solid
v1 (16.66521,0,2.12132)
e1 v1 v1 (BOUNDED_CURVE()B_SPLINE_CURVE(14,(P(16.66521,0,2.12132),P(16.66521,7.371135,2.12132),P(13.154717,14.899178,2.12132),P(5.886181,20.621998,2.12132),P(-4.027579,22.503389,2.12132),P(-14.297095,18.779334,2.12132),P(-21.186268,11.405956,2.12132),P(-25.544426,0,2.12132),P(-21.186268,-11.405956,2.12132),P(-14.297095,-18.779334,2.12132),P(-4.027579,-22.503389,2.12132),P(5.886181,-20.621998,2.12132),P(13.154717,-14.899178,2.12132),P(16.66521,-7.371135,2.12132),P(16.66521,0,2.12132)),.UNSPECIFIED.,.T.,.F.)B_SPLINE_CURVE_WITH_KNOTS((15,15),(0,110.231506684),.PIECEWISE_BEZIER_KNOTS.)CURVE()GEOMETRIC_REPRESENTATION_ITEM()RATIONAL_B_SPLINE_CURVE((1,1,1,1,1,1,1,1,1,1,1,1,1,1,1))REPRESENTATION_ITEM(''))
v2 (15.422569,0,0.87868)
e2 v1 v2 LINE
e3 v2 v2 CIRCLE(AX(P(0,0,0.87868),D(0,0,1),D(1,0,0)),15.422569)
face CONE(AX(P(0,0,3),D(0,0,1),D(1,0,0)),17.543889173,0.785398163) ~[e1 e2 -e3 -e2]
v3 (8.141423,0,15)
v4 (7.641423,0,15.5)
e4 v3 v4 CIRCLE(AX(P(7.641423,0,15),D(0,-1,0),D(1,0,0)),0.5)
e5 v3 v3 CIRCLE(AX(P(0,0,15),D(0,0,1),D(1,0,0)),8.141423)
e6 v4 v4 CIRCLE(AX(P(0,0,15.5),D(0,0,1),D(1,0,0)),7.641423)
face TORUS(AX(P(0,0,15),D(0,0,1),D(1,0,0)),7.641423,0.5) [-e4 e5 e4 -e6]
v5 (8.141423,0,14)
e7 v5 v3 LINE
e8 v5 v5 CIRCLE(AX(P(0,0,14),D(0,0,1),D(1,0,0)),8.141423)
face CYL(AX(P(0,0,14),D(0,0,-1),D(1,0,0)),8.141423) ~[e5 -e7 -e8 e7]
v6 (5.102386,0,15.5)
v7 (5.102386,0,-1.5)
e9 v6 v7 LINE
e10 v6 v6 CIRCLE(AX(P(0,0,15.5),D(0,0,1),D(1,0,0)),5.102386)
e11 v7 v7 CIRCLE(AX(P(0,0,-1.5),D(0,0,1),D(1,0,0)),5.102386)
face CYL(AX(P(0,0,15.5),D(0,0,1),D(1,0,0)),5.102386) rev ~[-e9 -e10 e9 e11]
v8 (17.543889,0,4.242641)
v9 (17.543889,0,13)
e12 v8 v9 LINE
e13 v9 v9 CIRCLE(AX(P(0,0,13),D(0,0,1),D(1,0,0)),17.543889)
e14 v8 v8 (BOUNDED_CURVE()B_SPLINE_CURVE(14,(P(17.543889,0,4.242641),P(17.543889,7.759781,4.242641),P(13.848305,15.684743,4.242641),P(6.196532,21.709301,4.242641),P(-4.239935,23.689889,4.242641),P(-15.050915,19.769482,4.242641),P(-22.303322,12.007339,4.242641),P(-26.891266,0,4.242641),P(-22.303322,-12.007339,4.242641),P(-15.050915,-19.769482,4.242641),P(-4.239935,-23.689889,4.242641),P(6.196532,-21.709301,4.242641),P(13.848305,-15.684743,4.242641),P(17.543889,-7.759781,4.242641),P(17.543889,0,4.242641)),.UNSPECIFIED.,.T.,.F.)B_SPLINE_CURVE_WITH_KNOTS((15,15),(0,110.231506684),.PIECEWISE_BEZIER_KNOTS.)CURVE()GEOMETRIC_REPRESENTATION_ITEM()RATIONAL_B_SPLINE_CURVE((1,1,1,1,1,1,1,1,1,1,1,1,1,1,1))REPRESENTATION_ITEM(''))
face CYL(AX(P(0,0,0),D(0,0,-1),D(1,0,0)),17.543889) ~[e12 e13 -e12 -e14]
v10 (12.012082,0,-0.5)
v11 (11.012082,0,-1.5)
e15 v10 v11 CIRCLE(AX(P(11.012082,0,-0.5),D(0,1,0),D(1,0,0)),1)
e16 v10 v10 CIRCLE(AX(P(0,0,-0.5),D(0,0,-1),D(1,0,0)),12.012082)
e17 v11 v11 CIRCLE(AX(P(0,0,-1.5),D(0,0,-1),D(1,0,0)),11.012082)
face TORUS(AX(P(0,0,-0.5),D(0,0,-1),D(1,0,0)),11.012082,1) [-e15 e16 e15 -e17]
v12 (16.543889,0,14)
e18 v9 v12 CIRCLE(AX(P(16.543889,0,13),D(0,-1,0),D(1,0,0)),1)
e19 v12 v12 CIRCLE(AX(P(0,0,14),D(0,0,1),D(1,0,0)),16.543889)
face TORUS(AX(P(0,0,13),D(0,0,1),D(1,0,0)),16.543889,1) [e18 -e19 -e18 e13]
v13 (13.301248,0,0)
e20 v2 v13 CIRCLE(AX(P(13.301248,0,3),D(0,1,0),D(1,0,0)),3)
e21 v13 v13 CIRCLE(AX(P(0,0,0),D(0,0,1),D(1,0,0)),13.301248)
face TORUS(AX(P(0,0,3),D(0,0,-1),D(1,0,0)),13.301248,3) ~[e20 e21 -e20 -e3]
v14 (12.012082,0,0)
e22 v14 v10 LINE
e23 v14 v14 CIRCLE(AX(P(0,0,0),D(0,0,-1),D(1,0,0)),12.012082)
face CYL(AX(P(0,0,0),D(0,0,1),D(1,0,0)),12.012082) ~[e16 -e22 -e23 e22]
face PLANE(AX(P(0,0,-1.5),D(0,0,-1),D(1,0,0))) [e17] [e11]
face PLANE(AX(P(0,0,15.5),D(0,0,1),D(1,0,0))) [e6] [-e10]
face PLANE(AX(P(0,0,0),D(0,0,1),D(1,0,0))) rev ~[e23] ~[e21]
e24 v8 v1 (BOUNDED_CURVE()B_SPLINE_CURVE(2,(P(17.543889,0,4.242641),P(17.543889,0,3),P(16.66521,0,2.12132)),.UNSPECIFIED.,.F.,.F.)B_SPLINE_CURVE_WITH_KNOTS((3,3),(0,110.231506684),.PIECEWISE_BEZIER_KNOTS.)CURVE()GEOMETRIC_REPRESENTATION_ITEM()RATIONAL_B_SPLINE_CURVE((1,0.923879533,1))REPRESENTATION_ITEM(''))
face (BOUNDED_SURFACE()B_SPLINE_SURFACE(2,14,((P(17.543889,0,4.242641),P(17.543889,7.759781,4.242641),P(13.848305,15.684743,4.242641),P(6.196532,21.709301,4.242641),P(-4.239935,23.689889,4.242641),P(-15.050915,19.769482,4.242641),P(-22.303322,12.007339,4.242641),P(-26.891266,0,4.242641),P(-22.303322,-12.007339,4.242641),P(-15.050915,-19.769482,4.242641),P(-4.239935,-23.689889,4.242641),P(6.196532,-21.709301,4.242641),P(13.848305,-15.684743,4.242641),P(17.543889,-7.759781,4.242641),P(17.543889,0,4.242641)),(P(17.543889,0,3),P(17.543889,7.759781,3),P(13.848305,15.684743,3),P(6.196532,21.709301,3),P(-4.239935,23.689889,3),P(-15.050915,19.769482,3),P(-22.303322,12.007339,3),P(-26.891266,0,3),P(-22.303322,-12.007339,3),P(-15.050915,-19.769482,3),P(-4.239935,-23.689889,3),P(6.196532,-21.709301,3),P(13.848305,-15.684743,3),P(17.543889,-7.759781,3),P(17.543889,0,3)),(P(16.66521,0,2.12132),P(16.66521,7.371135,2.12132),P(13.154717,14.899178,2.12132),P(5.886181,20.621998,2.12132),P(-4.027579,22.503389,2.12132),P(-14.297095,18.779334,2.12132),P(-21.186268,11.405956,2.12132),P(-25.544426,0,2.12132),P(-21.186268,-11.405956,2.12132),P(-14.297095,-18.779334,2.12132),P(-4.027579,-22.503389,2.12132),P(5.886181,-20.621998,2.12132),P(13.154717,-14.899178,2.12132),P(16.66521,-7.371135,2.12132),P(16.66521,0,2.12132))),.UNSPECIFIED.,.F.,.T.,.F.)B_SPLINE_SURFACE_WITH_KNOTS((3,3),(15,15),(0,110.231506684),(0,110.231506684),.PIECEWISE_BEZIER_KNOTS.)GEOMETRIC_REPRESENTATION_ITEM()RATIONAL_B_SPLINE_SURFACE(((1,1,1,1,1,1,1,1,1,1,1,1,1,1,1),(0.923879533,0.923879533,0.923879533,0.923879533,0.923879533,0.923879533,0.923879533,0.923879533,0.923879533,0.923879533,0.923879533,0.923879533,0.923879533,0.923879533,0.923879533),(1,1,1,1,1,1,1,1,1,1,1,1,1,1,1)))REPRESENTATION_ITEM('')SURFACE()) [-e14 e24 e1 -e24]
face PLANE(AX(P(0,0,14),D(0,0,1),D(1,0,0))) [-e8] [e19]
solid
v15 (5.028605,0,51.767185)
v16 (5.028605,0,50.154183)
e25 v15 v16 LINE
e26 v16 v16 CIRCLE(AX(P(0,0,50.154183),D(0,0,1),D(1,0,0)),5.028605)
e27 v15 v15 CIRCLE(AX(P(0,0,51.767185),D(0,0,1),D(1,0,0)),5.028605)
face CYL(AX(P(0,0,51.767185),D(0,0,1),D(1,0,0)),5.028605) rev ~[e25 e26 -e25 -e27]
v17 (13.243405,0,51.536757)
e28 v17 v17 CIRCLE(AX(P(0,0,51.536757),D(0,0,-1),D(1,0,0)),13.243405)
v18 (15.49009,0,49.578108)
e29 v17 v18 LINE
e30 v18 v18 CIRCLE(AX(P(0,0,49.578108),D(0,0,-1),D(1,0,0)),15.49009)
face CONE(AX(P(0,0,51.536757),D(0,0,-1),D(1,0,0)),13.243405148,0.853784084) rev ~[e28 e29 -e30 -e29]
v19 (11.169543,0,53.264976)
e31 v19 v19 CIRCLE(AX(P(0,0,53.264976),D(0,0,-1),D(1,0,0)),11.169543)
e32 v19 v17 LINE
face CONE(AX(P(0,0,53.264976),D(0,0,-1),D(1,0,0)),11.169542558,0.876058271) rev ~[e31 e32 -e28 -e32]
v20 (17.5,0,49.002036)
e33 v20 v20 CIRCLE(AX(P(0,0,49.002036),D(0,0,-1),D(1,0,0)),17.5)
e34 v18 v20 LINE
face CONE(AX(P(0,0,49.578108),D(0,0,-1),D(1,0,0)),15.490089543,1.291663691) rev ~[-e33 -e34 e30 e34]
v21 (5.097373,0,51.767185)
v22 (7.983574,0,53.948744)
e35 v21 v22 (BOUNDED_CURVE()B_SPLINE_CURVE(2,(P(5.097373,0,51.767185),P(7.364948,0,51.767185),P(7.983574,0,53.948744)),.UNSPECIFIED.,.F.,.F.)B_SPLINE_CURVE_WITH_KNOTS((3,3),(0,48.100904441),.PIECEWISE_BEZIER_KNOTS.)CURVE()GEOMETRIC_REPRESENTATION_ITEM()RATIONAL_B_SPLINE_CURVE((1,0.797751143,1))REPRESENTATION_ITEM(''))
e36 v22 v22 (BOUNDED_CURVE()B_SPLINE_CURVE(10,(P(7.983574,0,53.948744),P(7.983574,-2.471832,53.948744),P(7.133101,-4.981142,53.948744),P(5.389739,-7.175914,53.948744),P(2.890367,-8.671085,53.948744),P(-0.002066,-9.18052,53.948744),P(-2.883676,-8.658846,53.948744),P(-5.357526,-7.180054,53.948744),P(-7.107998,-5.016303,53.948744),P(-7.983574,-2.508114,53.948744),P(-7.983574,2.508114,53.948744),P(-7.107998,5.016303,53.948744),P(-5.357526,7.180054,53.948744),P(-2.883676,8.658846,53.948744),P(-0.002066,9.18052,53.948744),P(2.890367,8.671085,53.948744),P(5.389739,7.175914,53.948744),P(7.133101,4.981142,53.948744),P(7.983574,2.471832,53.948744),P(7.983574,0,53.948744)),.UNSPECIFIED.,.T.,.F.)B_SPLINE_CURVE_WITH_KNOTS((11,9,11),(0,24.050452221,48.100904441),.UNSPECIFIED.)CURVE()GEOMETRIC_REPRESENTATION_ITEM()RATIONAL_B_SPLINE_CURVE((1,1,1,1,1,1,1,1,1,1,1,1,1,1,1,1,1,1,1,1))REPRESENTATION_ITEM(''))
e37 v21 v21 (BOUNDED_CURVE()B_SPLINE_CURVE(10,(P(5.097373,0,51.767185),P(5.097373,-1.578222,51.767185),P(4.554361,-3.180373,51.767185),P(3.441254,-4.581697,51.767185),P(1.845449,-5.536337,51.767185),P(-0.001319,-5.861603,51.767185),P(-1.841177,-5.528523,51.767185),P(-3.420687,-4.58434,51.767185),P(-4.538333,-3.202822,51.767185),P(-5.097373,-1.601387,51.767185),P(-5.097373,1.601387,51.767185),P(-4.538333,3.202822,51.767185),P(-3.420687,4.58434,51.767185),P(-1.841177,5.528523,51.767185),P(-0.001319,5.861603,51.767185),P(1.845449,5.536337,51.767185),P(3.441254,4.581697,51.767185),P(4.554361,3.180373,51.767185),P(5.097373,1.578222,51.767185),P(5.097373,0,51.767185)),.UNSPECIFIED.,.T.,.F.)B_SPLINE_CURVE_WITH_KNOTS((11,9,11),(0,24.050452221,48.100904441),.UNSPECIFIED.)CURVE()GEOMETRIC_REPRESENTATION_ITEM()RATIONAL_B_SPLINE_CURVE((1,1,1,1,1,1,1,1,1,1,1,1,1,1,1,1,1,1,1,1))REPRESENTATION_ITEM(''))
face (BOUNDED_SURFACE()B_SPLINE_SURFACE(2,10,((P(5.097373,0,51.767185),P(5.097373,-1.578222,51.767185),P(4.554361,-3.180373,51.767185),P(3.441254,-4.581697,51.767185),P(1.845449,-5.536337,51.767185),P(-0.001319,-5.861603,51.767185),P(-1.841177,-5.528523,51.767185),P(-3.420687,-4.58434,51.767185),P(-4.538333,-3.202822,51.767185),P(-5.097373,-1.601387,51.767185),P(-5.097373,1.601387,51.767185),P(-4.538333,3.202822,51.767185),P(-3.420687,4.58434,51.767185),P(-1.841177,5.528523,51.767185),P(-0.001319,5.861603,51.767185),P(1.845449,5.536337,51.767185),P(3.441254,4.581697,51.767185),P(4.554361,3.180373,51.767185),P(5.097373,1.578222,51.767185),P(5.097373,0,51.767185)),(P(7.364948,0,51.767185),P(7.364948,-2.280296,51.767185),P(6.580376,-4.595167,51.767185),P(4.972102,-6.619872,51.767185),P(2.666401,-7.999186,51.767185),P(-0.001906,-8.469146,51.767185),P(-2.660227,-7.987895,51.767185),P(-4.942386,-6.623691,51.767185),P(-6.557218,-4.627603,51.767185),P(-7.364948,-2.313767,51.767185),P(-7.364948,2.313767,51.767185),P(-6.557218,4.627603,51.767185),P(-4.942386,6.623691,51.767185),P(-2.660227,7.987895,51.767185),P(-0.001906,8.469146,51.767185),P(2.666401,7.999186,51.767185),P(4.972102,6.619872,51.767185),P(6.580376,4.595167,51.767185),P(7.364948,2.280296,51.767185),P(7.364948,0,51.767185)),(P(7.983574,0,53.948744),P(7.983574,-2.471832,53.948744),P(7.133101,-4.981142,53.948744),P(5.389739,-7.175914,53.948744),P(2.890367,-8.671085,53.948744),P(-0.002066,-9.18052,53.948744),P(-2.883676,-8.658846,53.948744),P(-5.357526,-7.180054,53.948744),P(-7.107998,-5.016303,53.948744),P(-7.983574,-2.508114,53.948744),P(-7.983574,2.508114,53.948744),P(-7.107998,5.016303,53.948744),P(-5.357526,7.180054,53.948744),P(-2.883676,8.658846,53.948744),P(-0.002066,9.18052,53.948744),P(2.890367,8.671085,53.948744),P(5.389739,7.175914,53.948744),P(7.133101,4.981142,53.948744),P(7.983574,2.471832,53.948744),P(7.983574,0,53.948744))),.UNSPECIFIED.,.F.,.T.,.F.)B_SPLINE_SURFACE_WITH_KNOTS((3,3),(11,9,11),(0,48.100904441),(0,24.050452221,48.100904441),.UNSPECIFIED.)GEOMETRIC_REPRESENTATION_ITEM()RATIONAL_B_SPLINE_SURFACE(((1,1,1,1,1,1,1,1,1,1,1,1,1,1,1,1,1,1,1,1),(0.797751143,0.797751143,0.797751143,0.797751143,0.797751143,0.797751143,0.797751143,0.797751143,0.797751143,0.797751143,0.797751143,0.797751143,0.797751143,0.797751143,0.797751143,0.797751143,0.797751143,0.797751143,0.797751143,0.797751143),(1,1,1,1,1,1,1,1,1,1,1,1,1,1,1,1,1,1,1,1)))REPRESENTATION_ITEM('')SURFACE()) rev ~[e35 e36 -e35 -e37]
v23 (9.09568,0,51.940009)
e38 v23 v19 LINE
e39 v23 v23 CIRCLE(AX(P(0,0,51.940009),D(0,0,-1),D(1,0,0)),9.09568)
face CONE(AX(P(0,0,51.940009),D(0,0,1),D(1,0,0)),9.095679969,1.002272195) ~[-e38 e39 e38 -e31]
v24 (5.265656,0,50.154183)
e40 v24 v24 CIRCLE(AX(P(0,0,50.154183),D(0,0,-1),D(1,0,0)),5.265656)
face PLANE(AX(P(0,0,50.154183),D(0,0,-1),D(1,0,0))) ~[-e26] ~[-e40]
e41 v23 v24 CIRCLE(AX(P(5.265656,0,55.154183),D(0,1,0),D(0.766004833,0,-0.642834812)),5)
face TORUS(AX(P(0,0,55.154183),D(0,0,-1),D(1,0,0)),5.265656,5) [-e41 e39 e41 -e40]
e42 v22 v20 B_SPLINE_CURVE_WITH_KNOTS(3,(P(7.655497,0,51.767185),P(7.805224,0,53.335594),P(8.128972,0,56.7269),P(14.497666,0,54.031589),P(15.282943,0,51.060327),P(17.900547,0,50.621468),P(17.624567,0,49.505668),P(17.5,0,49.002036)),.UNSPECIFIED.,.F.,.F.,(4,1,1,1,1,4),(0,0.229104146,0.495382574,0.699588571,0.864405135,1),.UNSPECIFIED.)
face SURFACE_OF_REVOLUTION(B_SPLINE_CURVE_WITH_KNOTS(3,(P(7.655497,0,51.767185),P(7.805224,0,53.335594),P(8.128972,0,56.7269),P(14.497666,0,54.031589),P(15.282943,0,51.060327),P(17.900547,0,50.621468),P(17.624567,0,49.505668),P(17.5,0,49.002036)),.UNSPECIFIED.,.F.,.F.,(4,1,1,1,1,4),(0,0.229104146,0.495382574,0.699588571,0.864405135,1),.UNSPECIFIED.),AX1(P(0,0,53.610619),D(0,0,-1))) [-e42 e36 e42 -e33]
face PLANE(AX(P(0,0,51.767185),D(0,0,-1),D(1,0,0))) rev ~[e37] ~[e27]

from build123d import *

# Parameters (mm, degrees)
F0_R      = 17.5438891732
F1_DEPTH  = 14
F2_R      = 12.0120819091
F3_DEPTH  = 1.5
F4_R      = 8.1414232705
F5_DEPTH  = 1.5
F6_R      = 5.1023864689
F7_DEPTH  = 25
F8_SIZE   = 3
F9_R      = 3
F10_R     = 1
F11_R     = 0.5
F14_R     = 3
F16_R     = 5.0286050309
F17_DEPTH = 20


# Not quite as in the source:
# - a fillet or chamfer that OpenCascade refuses, or shapes differently, is made with other operations: its cross-section is extruded or revolved along the edge and cut away or added


with BuildPart() as f1:
    # F0 (on Top) → F1 (new body)
    with BuildSketch(Plane.XY):
        Circle(F0_R)
    extrude(amount=F1_DEPTH)

    # F2 (on face) → F3 (join)
    with BuildSketch(Plane(origin=(0, 0, 0), x_dir=(1, 0, 0), z_dir=(0, 0, -1))):
        Circle(F2_R)
    extrude(amount=F3_DEPTH)

    # F4 (on face) → F5 (join)
    with BuildSketch(Plane.XY.offset(14)):
        Circle(F4_R)
    extrude(amount=F5_DEPTH)

    # F6 (on face) → F7 (cut)
    with BuildSketch(Plane.XY.offset(15.5)):
        Circle(F6_R)
    extrude(amount=-F7_DEPTH, mode=Mode.SUBTRACT)

    # F8
    f8_edges = [f1.edges().sort_by_distance(p)[0] for p in [
        (-17.543889, 0, 0),
    ]]
    chamfer(f8_edges, length=F8_SIZE)

    # F9
    f9_edges = [f1.edges().sort_by_distance(p)[0] for p in [
        (16.043889, 0, 1.5),
        (-17.543889, 0, 3),
        (-14.543889, 0, 0),
    ]]
    fillet(f9_edges, radius=F9_R)

    # F10
    f10_edges = [f1.edges().sort_by_distance(p)[0] for p in [
        (-17.543889, 0, 14),
        (-12.012082, 0, -1.5),
    ]]
    fillet(f10_edges, radius=F10_R)

    # F11
    f11_edges = [f1.edges().sort_by_distance(p)[0] for p in [
        (-8.141423, 0, 15.5),
    ]]
    fillet(f11_edges, radius=F11_R)


with BuildPart() as f13:
    # F12 (on Front) → F13 (revolve)
    with BuildSketch(Plane.XZ):
        with BuildLine():
            Line((7.655496709, 51.7671853304), (0, 51.7671853304))
            Line((0, 51.7671853304), (0, 50.1541830599))
            Line((0, 50.1541830599), (8.6348215118, 50.1541830599))
            Line((8.6348215118, 50.1541830599), (9.0956799686, 51.9400089979))
            Line((9.0956799686, 51.9400089979), (11.1695425585, 53.2649755478))
            Line((11.1695425585, 53.2649755478), (13.2434051484, 51.536757499))
            Line((13.2434051484, 51.536757499), (15.4900895432, 49.5781078935))
            Line((15.4900895432, 49.5781078935), (17.5, 49.0020364523))
            add(Edge.make_bspline(
                [(7.655496709, 51.7671853304), (7.8052236894, 53.3355937889), (8.1289722473, 56.7268995876), (14.497666046, 54.0315890321), (15.2829429137, 51.0603268241), (17.9005469417, 50.6214675024), (17.6245672577, 49.5056680221), (17.5, 49.0020364523)],
                knots=[0, 0, 0, 0, 0.229104146, 0.4953825737, 0.6995885707, 0.8644051351, 1, 1, 1, 1], degree=3))
        make_face()
    revolve(axis=Axis((0, 0, 53.6106191576), (0, 0, -1)))

    # F14
    f14_edges = [f13.edges().sort_by_distance(p)[0] for p in [
        (-7.655497, 0, 51.767185),
    ]]
    fillet(f14_edges, radius=F14_R)

    # F15: fillet of radius 5 on 1 edges, made by hand

    # F15_s1 → F15_t2 (revolve, cut)
    with BuildSketch(Plane.XZ):
        with BuildLine():
            ThreePointArc((9.0956799686, 51.9400089979), (7.3786074945, 50.6225790222), (5.2656558043, 50.1541830599))
            Line((5.2656558043, 50.1541830599), (5.2656558043, 50.0541830599))
            Line((5.2656558043, 50.0541830599), (8.6348215118, 50.0541830599))
            Line((8.6348215118, 50.0541830599), (8.7316492422, 50.1291952504))
            ThreePointArc((8.7316492422, 50.1291952504), (8.9620784706, 51.0221082194), (9.1722804519, 51.8757255167))
            Line((9.1722804519, 51.8757255167), (9.0956799686, 51.9400089979))
        make_face()
    revolve(axis=Axis((0, 0, 50.1541830599), (0, 0, -1)), mode=Mode.SUBTRACT)

    # F16 (on face) → F17 (cut)
    with BuildSketch(Plane.XY.offset(51.7671853304)):
        Circle(F16_R)
    extrude(amount=-F17_DEPTH, mode=Mode.SUBTRACT)


solid = Compound([f1.part, f13.part])
